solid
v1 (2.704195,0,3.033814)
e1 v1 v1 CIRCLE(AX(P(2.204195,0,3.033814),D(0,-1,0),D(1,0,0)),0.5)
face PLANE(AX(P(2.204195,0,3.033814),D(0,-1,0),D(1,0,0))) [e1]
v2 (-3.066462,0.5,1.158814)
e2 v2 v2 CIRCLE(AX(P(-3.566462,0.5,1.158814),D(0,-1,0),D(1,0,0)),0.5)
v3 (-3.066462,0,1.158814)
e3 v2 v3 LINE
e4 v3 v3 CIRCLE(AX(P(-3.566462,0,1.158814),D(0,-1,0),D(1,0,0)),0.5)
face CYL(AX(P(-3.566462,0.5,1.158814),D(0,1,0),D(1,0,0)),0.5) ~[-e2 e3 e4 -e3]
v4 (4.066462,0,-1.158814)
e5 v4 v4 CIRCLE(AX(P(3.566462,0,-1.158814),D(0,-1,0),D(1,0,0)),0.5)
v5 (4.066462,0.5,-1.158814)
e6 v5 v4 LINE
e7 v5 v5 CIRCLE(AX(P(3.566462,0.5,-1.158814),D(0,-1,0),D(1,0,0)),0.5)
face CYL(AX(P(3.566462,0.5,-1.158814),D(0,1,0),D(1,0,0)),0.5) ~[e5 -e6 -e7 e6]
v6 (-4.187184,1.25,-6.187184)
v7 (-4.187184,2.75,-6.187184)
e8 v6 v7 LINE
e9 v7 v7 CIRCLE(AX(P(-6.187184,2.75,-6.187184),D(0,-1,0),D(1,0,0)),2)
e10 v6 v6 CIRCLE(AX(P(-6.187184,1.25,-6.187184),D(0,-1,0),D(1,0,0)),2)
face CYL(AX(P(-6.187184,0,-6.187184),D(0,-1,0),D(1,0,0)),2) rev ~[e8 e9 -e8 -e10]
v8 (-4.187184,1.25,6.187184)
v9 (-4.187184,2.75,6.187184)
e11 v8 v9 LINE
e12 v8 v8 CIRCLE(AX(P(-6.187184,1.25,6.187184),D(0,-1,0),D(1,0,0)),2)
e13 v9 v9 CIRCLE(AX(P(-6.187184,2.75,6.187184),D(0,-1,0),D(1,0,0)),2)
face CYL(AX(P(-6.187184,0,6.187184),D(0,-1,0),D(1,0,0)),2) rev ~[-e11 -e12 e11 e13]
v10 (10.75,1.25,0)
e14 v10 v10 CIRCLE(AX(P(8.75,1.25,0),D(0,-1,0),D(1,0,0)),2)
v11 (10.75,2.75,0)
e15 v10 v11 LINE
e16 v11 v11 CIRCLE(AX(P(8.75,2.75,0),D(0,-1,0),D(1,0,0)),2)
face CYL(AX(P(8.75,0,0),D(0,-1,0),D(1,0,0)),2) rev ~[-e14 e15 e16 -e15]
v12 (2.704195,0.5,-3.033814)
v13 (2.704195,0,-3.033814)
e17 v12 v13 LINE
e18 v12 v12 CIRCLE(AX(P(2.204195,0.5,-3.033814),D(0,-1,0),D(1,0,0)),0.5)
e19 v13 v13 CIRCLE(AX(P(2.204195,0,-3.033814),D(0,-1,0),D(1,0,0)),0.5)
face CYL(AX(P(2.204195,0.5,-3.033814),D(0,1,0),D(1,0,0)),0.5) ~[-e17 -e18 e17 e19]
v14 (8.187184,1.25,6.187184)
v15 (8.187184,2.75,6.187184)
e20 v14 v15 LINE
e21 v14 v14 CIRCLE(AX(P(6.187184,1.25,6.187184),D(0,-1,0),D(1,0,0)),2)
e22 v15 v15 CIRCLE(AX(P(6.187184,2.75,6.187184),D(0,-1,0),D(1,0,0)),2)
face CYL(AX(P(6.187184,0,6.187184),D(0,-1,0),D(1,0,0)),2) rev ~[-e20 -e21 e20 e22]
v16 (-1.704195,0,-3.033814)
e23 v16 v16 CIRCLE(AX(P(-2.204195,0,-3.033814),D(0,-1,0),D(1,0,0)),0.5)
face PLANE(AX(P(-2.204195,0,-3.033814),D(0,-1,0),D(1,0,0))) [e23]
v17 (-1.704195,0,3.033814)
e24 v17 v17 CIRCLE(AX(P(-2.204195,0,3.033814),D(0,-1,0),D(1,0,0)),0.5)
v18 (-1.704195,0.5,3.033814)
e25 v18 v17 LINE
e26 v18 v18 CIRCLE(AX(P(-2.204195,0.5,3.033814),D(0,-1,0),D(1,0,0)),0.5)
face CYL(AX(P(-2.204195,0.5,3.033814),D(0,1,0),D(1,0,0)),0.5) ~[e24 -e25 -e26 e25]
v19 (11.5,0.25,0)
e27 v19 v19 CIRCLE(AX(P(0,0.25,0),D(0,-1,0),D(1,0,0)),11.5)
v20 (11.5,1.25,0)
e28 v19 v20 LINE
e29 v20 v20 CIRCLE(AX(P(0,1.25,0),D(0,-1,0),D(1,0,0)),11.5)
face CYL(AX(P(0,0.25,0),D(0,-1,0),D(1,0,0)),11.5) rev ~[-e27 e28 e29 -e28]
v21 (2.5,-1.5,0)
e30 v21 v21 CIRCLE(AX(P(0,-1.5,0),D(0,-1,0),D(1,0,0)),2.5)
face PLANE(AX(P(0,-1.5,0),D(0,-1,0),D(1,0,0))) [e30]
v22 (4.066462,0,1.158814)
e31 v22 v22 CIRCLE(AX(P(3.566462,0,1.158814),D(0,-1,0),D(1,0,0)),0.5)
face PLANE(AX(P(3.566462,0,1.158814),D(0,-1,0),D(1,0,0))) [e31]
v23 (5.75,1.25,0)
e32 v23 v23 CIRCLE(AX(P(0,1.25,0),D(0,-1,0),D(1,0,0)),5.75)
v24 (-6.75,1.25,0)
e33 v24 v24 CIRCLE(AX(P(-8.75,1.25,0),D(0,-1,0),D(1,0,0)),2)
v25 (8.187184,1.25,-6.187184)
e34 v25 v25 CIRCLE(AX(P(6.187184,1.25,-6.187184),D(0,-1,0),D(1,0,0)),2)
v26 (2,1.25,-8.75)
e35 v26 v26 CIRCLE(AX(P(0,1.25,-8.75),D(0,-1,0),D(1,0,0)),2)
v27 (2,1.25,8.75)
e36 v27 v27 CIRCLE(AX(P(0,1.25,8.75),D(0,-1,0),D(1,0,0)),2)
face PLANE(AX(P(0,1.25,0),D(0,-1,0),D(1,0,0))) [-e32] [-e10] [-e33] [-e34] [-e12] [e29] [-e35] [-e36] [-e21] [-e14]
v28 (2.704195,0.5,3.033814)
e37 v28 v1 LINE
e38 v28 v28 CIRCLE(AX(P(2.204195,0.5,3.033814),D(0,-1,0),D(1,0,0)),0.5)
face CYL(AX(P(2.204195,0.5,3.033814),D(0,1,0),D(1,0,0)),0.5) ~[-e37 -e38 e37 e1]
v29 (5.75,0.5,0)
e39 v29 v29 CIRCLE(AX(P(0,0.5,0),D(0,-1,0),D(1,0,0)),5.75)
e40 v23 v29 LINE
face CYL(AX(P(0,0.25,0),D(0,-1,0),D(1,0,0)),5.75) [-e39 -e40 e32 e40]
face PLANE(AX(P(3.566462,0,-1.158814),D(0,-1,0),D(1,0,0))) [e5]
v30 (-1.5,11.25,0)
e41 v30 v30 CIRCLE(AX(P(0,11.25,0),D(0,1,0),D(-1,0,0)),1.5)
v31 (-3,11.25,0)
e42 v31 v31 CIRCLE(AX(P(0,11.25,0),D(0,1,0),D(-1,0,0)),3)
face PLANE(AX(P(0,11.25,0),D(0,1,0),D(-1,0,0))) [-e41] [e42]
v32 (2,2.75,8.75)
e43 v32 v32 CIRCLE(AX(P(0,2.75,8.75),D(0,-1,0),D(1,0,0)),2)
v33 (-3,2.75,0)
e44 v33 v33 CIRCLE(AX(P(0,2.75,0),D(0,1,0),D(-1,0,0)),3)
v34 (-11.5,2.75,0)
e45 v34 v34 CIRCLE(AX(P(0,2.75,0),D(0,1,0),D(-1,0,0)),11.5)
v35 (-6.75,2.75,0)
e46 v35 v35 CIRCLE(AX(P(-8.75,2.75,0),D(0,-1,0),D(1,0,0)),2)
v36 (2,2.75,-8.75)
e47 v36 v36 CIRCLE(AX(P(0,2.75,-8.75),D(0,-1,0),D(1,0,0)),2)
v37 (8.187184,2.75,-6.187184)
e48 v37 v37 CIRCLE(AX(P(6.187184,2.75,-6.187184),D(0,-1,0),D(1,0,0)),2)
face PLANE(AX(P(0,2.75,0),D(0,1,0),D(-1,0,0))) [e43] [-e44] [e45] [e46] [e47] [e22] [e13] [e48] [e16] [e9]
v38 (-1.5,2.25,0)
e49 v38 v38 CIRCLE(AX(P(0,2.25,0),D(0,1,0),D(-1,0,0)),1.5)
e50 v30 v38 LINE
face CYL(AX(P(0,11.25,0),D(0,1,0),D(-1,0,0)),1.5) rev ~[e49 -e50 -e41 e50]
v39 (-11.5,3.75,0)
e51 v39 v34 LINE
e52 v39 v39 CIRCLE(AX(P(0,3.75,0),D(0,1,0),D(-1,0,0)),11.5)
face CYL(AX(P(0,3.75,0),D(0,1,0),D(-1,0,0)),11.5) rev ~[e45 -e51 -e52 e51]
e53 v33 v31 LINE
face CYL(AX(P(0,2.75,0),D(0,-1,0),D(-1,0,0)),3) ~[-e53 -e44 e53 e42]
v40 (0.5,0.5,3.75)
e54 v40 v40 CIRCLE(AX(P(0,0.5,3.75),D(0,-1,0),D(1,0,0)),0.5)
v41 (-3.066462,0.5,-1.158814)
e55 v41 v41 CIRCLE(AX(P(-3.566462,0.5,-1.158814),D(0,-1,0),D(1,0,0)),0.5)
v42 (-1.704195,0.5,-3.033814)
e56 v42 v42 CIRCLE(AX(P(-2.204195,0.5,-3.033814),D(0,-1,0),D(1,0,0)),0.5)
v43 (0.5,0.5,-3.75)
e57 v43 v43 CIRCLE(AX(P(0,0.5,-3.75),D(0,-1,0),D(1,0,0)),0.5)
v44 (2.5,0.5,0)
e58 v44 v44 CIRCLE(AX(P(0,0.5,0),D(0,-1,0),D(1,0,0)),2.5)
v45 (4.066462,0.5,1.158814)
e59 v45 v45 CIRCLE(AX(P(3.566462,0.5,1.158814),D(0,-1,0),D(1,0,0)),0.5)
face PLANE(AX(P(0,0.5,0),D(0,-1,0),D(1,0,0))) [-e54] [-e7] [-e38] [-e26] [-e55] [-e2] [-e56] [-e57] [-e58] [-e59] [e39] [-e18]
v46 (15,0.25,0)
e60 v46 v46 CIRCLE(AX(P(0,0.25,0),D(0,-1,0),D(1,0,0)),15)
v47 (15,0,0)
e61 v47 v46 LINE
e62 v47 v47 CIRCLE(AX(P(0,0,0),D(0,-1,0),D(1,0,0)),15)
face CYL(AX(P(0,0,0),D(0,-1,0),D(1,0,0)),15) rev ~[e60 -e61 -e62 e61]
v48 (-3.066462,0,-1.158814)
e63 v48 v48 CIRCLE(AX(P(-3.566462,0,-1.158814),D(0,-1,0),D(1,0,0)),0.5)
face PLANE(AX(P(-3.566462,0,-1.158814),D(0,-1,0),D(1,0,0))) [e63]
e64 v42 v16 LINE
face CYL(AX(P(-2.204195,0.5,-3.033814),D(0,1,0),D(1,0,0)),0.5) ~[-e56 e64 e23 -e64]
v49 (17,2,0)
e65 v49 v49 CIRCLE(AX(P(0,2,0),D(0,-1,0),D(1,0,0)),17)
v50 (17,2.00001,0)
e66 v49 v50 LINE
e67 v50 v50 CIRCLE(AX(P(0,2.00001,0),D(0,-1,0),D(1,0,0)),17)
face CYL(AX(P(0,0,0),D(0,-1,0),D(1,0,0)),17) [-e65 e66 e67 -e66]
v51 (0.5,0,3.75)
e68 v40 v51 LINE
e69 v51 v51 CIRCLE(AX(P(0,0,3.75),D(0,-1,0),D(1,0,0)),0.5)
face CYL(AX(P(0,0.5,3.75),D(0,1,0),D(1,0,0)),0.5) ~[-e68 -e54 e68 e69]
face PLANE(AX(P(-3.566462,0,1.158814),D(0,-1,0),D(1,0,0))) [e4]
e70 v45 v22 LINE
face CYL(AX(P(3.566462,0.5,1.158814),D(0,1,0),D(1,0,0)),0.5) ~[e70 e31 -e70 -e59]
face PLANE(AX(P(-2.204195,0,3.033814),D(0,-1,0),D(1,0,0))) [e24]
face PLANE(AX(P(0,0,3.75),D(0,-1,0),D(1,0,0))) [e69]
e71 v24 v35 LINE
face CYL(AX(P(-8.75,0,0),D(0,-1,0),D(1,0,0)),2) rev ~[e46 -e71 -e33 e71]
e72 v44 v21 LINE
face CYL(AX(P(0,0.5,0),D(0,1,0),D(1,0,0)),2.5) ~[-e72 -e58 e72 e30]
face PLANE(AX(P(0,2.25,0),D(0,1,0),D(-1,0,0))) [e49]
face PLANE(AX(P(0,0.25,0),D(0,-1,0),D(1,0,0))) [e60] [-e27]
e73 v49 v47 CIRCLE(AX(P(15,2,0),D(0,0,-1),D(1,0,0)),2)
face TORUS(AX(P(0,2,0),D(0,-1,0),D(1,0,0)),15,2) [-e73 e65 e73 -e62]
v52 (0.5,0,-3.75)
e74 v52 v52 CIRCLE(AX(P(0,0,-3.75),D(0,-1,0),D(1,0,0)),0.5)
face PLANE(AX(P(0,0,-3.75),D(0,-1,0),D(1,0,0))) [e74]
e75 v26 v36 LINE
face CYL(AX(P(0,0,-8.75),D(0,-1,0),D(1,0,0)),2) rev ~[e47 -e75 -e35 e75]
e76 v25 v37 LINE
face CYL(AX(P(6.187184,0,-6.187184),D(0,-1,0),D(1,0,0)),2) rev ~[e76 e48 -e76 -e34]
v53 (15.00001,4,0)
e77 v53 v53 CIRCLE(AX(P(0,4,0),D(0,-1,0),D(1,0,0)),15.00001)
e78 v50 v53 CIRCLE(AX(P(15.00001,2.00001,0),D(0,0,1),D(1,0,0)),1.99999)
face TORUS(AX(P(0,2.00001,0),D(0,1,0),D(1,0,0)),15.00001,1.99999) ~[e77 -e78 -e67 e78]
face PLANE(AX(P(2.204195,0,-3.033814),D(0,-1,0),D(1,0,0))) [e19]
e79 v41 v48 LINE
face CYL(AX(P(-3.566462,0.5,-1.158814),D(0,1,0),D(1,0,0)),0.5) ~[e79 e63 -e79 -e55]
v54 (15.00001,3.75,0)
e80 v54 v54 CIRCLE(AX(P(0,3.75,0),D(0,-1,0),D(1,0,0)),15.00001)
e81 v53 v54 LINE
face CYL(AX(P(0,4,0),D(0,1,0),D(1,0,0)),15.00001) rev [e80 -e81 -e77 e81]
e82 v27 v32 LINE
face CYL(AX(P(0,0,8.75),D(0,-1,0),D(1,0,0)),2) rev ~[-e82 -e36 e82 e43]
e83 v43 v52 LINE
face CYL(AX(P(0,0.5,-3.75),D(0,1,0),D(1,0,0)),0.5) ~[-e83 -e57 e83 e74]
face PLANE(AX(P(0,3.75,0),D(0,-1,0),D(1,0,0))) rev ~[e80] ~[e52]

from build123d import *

# Parameters (mm, degrees)
F0_R      = 17
F1_DEPTH  = 4
F2_R      = 2
F3_R      = 1.99999
F4_R      = 15
F4_R_2    = 2
F4_R_3    = 5.75
F5_DEPTH  = 0.25
F6_DEPTH  = 0.25
F7_R      = 11.5
F7_R_2    = 2
F7_R_3    = 5.75
F8_DEPTH  = 1
F9_R      = 11.5
F10_DEPTH = 1
F11_DEPTH = 5
F12_DEPTH = 0.5
F13_R     = 0.5
F14_DEPTH = 0.5
F13_R_2   = 2.5
F15_DEPTH = 2
F16_R     = 3
F17_DEPTH = 8.5
F18_R     = 1.5
F19_DEPTH = 9


# Not quite as in the source:
# - a fillet or chamfer is up to 0.001 mm smaller than in the source, because OpenCascade refuses the exact size


with BuildPart() as f1:
    # F0 (on Front) → F1 (new body)
    with BuildSketch(Plane.XZ):
        Circle(F0_R)
    extrude(amount=-F1_DEPTH)

    # F2
    f2_edges = [f1.edges().sort_by_distance(p)[0] for p in [
        (-17, 0, 0),
    ]]
    fillet(f2_edges, radius=F2_R)

    # F3 (radius 2 in the source; OpenCascade refuses exactly that, so slightly less here)
    f3_edges = [f1.edges().sort_by_distance(p)[0] for p in [
        (-17, 4, 0),
    ]]
    fillet(f3_edges, radius=F3_R)

    # F4 (on face) → F5 (cut)
    with BuildSketch(Plane.XZ):
        Circle(F4_R)
        with Locations((-6.1871843354, -6.1871843354)):
            Circle(F4_R_2, mode=Mode.SUBTRACT)
        with Locations((0, -8.75)):
            Circle(F4_R_2, mode=Mode.SUBTRACT)
        with Locations((6.1871843354, -6.1871843354)):
            Circle(F4_R_2, mode=Mode.SUBTRACT)
        with Locations((-8.75, 0)):
            Circle(F4_R_2, mode=Mode.SUBTRACT)
        with Locations((-6.1871843354, 6.1871843354)):
            Circle(F4_R_2, mode=Mode.SUBTRACT)
        Circle(F4_R_3, mode=Mode.SUBTRACT)
        with Locations((6.1871843354, 6.1871843354)):
            Circle(F4_R_2, mode=Mode.SUBTRACT)
        with Locations((8.75, 0)):
            Circle(F4_R_2, mode=Mode.SUBTRACT)
        with Locations((0, 8.75)):
            Circle(F4_R_2, mode=Mode.SUBTRACT)
    extrude(amount=-F5_DEPTH, mode=Mode.SUBTRACT)

    # F6 (cut): a face of the model
    f6_faces = [f1.faces().sort_by_distance(p)[0] for p in [
        (0, 4, 0),
    ]]
    extrude(f6_faces, amount=-F6_DEPTH, mode=Mode.SUBTRACT)

    # F7 (on face) → F8 (cut)
    with BuildSketch(Plane.XZ.offset(-0.25)):
        Circle(F7_R)
        with Locations((-6.1871843354, -6.1871843354)):
            Circle(F7_R_2, mode=Mode.SUBTRACT)
        with Locations((0, -8.75)):
            Circle(F7_R_2, mode=Mode.SUBTRACT)
        with Locations((6.1871843354, -6.1871843354)):
            Circle(F7_R_2, mode=Mode.SUBTRACT)
        with Locations((-8.75, 0)):
            Circle(F7_R_2, mode=Mode.SUBTRACT)
        with Locations((-6.1871843354, 6.1871843354)):
            Circle(F7_R_2, mode=Mode.SUBTRACT)
        Circle(F7_R_3, mode=Mode.SUBTRACT)
        with Locations((6.1871843354, 6.1871843354)):
            Circle(F7_R_2, mode=Mode.SUBTRACT)
        with Locations((8.75, 0)):
            Circle(F7_R_2, mode=Mode.SUBTRACT)
        with Locations((0, 8.75)):
            Circle(F7_R_2, mode=Mode.SUBTRACT)
    extrude(amount=-F8_DEPTH, mode=Mode.SUBTRACT)

    # F9 (on face) → F10 (cut)
    with BuildSketch(Plane(origin=(0, 3.75, 0), x_dir=(-1, 0, 0), z_dir=(0, 1, 0))):
        Circle(F9_R)
    extrude(amount=-F10_DEPTH, mode=Mode.SUBTRACT)

    # F11 (cut): faces of the model
    f11_faces = [f1.faces().sort_by_distance(p)[0] for p in [
        (8.75, 0, 0),
        (6.1871843354, 0, -6.1871843354),
        (0, 0, -8.75),
        (-8.75, 0, 0),
        (0, 0, 8.75),
        (6.1871843354, 0, 6.1871843354),
        (-6.1871843354, 0, -6.1871843354),
        (-6.1871843354, 0, 6.1871843354),
    ]]
    extrude(f11_faces, amount=-F11_DEPTH, mode=Mode.SUBTRACT)

    # F12 (cut): a face of the model
    f12_faces = [f1.faces().sort_by_distance(p)[0] for p in [
        (0, 0, 0),
    ]]
    extrude(f12_faces, amount=-F12_DEPTH, mode=Mode.SUBTRACT)

    # F13 (on face) → F14 (join)
    with BuildSketch(Plane.XZ.offset(-0.5)):
        with Locations((-2.2041946961, 3.0338137289)):
            Circle(F13_R)
        with Locations((-3.5664619361, 1.1588137289)):
            Circle(F13_R)
        with Locations((-3.5664619361, -1.1588137289)):
            Circle(F13_R)
        with Locations((-2.2041946961, -3.0338137289)):
            Circle(F13_R)
        with Locations((2.2041946961, -3.0338137289)):
            Circle(F13_R)
        with Locations((3.5664619361, -1.1588137289)):
            Circle(F13_R)
        with Locations((3.5664619361, 1.1588137289)):
            Circle(F13_R)
        with Locations((2.2041946961, 3.0338137289)):
            Circle(F13_R)
        with Locations((0, 3.75)):
            Circle(F13_R)
        with Locations((0, -3.75)):
            Circle(F13_R)
    extrude(amount=F14_DEPTH)

    # F13 (on face) → F15 (join)
    with BuildSketch(Plane.XZ.offset(-0.5)):
        Circle(F13_R_2)
    extrude(amount=F15_DEPTH)

    # F16 (on face) → F17 (join)
    with BuildSketch(Plane(origin=(0, 2.75, 0), x_dir=(-1, 0, 0), z_dir=(0, 1, 0))):
        Circle(F16_R)
    extrude(amount=F17_DEPTH)

    # F18 (on face) → F19 (cut)
    with BuildSketch(Plane(origin=(0, 11.25, 0), x_dir=(-1, 0, 0), z_dir=(0, 1, 0))):
        Circle(F18_R)
    extrude(amount=-F19_DEPTH, mode=Mode.SUBTRACT)


solid = f1.part
